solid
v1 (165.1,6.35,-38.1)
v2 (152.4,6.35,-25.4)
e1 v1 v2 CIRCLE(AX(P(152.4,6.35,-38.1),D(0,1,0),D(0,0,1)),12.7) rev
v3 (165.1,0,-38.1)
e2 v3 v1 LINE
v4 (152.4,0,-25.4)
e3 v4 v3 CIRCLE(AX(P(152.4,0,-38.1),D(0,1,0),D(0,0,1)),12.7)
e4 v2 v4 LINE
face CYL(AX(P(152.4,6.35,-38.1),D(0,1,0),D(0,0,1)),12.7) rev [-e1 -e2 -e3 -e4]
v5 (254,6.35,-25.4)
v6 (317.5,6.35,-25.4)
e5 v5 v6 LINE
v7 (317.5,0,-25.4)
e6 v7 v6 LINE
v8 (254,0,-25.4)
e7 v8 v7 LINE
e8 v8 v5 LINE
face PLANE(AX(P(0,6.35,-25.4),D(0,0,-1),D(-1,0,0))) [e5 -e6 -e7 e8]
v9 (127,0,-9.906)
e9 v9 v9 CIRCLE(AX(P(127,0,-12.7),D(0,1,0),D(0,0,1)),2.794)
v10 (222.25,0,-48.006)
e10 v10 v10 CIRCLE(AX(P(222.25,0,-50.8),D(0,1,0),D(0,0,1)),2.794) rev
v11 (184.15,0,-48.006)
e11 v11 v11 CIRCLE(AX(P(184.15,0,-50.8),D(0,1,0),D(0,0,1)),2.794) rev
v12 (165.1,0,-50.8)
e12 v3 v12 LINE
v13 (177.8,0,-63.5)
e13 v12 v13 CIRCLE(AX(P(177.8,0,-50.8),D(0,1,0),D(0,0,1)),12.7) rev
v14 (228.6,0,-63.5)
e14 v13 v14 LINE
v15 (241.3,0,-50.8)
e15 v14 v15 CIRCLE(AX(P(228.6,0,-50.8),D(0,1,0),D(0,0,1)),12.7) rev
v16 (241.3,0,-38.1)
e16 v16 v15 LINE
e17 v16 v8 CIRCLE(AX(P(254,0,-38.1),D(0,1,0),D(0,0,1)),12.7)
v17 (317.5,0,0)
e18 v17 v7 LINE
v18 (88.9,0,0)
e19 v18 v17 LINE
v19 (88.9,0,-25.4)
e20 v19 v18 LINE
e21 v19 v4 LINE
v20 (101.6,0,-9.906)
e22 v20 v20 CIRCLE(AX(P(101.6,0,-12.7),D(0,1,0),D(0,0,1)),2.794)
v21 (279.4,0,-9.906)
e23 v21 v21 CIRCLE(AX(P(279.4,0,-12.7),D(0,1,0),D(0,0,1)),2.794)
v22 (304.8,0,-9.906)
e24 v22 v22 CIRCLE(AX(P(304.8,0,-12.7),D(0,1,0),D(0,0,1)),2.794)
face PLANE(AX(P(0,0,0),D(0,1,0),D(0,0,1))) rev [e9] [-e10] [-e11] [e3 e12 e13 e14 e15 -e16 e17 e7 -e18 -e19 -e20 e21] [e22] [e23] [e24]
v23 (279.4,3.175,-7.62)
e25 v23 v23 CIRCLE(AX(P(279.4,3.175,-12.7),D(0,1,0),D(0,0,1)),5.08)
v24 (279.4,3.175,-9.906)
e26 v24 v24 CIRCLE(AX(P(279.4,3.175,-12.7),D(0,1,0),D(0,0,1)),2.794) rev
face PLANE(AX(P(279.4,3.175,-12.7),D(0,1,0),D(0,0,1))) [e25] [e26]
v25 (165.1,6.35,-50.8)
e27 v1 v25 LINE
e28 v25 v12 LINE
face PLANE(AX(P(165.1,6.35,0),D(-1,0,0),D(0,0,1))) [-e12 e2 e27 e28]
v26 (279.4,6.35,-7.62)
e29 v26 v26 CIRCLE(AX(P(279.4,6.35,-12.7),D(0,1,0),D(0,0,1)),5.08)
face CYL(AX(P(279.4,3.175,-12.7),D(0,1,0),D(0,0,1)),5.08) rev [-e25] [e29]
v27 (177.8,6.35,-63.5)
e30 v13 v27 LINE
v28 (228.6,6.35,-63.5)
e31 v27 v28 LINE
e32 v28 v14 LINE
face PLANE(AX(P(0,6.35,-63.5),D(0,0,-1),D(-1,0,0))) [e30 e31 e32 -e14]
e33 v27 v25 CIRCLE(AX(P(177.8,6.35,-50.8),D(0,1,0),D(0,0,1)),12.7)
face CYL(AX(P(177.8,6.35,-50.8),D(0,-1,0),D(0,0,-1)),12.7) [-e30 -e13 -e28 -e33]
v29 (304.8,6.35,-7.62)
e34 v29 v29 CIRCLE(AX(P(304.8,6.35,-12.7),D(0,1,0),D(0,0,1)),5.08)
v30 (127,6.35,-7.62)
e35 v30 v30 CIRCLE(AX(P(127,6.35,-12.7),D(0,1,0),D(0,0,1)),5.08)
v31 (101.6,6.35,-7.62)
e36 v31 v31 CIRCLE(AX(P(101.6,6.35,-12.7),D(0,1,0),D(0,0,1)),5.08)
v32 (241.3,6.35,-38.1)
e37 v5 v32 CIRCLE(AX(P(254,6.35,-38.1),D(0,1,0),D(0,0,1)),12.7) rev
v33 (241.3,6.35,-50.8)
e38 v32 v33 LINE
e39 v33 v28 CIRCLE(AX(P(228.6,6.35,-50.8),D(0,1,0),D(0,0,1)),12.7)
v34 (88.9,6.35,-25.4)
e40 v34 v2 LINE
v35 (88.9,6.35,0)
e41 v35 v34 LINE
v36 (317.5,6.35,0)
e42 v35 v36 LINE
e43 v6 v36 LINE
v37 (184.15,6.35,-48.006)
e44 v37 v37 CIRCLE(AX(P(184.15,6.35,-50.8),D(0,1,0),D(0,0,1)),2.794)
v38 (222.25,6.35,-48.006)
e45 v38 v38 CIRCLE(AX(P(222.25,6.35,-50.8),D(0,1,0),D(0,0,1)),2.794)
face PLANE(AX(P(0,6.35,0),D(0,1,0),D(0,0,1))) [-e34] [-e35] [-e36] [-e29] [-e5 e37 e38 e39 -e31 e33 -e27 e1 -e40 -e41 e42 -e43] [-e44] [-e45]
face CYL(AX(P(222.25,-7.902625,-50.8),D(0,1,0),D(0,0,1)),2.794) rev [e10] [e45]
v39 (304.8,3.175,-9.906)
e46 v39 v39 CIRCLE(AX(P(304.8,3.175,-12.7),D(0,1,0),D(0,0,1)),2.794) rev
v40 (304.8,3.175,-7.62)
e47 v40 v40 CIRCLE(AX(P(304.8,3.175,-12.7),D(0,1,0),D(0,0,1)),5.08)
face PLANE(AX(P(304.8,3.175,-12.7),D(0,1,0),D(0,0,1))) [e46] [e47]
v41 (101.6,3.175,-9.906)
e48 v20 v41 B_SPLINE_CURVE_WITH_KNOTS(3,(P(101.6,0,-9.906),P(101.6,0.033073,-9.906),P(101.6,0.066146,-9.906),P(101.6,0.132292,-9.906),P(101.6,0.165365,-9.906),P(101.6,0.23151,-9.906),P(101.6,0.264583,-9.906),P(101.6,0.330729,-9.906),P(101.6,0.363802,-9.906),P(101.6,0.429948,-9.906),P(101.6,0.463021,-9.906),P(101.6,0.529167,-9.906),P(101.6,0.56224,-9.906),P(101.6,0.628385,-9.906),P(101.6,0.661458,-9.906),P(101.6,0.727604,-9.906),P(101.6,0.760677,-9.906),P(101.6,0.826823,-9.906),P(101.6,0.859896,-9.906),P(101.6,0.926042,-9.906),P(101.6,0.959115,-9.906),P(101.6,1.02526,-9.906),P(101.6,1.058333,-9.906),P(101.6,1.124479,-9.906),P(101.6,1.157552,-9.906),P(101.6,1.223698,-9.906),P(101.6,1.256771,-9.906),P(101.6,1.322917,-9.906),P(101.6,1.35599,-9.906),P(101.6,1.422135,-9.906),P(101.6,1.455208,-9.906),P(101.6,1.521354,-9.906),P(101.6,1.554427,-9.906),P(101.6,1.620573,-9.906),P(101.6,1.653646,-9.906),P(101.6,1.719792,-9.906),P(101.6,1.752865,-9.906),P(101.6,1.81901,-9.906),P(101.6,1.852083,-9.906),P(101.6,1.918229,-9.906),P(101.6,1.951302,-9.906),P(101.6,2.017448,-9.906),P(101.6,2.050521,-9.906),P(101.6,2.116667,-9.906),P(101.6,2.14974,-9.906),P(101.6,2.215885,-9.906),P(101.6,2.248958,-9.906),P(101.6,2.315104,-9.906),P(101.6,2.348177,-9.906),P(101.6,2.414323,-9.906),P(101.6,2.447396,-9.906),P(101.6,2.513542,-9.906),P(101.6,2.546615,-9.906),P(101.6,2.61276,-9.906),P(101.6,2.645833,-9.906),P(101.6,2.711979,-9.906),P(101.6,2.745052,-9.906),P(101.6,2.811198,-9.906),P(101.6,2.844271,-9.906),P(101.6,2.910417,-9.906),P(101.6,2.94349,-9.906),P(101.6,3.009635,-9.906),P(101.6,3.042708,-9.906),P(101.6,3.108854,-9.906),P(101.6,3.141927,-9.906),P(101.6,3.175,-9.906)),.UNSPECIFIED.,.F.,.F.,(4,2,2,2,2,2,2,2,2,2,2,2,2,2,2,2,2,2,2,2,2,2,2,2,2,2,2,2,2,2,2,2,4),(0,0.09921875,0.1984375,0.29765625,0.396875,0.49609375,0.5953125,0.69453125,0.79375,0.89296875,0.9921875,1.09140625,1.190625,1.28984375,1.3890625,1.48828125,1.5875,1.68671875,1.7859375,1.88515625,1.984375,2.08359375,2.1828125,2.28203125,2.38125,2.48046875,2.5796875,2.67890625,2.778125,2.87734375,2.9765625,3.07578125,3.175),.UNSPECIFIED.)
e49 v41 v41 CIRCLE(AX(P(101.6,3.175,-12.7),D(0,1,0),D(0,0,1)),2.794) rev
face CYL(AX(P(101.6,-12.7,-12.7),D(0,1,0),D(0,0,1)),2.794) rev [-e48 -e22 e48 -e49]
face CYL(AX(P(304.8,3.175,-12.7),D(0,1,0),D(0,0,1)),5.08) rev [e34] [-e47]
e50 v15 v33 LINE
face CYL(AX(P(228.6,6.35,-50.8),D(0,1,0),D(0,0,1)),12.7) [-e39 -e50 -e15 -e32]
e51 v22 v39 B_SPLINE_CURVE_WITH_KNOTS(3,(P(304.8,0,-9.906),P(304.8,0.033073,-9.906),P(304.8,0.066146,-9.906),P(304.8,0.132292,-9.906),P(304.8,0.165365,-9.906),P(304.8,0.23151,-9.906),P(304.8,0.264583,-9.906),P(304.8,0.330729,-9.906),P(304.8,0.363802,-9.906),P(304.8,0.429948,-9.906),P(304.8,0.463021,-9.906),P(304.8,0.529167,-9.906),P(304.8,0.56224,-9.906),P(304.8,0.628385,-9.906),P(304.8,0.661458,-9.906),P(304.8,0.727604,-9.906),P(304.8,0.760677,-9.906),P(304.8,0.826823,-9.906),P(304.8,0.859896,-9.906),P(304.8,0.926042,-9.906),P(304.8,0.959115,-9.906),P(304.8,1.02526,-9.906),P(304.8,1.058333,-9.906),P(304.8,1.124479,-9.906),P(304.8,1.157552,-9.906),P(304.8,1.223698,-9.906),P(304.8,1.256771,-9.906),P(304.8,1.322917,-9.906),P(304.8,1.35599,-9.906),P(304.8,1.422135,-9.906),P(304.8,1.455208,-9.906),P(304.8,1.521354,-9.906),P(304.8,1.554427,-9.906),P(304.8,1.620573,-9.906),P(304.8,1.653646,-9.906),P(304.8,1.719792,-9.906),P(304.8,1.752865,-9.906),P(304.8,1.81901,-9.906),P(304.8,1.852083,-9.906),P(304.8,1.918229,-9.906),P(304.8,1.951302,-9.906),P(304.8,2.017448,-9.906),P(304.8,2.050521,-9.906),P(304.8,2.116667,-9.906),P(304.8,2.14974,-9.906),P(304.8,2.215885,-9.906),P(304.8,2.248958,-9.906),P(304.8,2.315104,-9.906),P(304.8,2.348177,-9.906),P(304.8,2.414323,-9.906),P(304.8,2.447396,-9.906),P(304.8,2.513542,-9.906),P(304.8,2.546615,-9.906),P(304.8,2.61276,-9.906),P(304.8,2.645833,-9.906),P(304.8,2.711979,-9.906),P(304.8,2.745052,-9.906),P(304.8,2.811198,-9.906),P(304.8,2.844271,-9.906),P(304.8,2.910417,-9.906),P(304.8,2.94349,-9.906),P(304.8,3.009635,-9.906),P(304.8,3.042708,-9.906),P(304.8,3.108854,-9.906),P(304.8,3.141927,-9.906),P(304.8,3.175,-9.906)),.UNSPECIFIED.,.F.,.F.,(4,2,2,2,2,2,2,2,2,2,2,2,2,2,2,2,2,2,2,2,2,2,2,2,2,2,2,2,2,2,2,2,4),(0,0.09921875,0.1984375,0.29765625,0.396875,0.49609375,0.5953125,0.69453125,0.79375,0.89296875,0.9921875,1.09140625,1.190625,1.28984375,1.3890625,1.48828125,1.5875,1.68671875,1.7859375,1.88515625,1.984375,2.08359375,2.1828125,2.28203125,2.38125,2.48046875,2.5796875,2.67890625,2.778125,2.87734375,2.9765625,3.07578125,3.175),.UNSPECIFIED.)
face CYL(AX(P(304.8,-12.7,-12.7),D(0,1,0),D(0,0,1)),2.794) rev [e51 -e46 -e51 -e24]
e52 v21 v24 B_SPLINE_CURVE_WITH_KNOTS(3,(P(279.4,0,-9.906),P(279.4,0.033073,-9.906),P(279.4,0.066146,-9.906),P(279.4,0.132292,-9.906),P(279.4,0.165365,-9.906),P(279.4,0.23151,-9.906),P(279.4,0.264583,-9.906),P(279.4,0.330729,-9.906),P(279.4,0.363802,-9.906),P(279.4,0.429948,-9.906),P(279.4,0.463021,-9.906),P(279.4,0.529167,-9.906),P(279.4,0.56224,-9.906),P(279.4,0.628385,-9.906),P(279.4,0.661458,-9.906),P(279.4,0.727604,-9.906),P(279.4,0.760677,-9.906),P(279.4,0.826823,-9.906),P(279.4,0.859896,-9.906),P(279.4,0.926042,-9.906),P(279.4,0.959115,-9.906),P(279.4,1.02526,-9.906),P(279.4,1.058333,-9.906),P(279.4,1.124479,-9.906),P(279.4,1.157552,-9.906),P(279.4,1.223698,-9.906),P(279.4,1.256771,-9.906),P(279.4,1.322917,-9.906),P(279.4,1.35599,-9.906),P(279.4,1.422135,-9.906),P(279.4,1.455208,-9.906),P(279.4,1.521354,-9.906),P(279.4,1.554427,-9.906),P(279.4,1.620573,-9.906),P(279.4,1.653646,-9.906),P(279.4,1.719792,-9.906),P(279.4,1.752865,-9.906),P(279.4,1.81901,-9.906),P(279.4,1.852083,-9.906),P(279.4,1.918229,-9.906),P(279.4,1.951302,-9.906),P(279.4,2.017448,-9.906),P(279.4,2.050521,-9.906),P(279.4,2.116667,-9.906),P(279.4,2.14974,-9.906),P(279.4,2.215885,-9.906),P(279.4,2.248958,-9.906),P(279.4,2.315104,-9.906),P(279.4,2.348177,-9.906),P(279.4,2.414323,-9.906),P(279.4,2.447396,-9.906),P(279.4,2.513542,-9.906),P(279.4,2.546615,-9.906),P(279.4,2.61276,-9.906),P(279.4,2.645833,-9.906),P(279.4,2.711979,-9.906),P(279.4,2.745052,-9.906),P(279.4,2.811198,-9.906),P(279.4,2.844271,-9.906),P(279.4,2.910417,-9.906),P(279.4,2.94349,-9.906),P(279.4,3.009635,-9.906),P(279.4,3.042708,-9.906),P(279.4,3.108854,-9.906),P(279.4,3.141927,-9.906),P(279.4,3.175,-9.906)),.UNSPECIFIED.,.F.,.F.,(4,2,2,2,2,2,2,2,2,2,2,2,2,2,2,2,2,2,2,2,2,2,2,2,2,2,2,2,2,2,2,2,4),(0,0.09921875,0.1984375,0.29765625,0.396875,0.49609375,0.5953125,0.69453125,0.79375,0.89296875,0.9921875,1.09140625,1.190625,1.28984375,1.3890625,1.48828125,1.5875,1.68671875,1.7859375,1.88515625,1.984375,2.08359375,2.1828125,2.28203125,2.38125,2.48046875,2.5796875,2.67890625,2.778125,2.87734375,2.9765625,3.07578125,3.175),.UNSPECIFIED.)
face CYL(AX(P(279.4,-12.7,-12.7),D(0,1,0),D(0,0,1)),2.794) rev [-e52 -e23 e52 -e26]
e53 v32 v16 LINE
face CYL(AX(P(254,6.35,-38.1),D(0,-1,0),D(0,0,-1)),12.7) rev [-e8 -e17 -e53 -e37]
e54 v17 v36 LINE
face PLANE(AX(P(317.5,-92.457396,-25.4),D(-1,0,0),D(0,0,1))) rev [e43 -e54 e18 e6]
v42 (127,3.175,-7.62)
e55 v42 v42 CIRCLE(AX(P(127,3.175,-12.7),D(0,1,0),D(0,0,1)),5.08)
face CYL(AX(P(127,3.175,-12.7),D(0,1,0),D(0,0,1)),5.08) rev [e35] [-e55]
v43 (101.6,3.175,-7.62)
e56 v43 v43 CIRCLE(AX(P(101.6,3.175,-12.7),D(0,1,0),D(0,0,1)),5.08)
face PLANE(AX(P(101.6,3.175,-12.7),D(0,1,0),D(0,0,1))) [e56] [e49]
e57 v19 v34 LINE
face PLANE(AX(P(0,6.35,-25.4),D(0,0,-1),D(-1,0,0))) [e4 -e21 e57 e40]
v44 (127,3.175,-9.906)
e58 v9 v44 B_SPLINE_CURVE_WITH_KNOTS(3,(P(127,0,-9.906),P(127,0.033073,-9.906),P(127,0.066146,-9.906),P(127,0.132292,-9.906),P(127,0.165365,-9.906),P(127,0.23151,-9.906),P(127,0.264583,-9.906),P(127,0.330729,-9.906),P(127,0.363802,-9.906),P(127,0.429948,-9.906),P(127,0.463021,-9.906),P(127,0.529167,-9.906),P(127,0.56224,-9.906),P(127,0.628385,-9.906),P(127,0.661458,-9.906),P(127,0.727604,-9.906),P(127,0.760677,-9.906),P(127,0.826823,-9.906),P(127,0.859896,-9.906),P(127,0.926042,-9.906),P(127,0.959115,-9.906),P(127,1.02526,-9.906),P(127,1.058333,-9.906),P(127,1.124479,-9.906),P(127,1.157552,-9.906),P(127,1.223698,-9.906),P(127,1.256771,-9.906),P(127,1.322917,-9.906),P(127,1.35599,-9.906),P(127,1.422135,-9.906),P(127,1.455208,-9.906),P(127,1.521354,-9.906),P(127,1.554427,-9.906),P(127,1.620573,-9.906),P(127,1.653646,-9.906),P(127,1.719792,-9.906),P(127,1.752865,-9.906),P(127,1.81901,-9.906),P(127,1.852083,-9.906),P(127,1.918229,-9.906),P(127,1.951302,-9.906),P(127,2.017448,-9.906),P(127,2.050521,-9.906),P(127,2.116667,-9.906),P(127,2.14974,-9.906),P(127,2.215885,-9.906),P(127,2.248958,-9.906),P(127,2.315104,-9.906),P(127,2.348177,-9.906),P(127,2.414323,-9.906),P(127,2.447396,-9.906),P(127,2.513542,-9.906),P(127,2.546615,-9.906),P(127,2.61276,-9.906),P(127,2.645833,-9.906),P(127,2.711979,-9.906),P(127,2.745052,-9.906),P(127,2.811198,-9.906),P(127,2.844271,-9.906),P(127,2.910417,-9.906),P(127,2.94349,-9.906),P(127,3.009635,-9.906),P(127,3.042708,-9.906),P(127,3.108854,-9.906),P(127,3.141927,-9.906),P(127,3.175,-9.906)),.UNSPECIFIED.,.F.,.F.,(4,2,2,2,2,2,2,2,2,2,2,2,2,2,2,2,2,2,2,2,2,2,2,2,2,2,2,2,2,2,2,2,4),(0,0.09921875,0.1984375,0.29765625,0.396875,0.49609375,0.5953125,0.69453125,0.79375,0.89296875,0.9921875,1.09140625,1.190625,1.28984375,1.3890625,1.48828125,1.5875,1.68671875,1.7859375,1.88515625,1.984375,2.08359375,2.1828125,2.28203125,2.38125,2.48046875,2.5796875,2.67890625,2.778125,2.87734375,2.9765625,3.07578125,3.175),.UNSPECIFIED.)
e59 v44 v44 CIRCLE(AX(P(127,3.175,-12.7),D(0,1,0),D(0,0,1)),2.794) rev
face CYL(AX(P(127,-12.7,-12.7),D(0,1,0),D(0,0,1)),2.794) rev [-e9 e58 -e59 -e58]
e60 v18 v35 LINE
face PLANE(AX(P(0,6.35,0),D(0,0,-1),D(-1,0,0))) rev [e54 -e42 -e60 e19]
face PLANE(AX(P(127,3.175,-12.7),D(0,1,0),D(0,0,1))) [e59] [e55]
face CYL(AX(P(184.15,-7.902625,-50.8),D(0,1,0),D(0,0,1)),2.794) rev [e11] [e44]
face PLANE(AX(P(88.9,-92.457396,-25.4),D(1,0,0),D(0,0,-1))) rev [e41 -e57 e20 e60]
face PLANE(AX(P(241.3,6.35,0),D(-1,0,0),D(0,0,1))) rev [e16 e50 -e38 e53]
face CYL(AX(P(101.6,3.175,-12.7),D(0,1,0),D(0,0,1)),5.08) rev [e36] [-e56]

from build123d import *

# Parameters (mm, degrees)
SKETCH1_W           = 406.4
SKETCH1_H           = 25.4
SKETCH1_W_2         = 76.2
SKETCH1_H_2         = 38.1
BOSS_EXTRUDE1_DEPTH = 6.35
SKETCH3_R           = 2.794
CUT_EXTRUDE2_DEPTH  = 6.35
FILLET1_R           = 12.7
SKETCH4_R           = 2.794
CUT_EXTRUDE3_DEPTH  = 19.05
SKETCH5_R           = 5.08
CUT_EXTRUDE4_DEPTH  = 3.175
SKETCH6_W           = 88.9
SKETCH6_H           = 25.4
CUT_EXTRUDE5_DEPTH  = 6.35


with BuildPart() as part:
    # Sketch1 → Boss-Extrude1 (new body)
    with BuildSketch(Plane(origin=(0, 0, 0), x_dir=(1, 0, 0), z_dir=(0, 1, 0))):
        with Locations((203.2, 12.7)):
            Rectangle(SKETCH1_W, SKETCH1_H)
        with Locations((203.2, 44.45)):
            Rectangle(SKETCH1_W_2, SKETCH1_H_2)
    extrude(amount=BOSS_EXTRUDE1_DEPTH)

    # Sketch3 → Cut-Extrude2 (cut)
    with BuildSketch(Plane(origin=(0, 6.35, 0), x_dir=(1, 0, 0), z_dir=(0, 1, 0))):
        with Locations(Location((222.25, 50.8, 0), (0, 0, 270))):
            Circle(SKETCH3_R)
        with Locations(Location((184.15, 50.8, 0), (0, 0, 270))):
            Circle(SKETCH3_R)
    extrude(amount=-CUT_EXTRUDE2_DEPTH, mode=Mode.SUBTRACT)

    # Fillet1
    fillet1_edges = [part.edges().sort_by_distance(p)[0] for p in [
        (406.4, 3.175, 0),
        (406.4, 3.175, -25.4),
        (0, 3.175, 0),
        (0, 3.175, -25.4),
        (165.1, 3.175, -25.4),
        (241.3, 3.175, -25.4),
        (241.3, 3.175, -63.5),
        (165.1, 3.175, -63.5),
    ]]
    fillet(fillet1_edges, radius=FILLET1_R - 0.0001)  # a hair under: the kernel refuses the full size

    # Sketch4 → Cut-Extrude3 (cut)
    with BuildSketch(Plane(origin=(0, 6.35, 0), x_dir=(1, 0, 0), z_dir=(0, 1, 0))):
        with Locations(Location((279.4, 12.7, 0), (0, 0, 270))):
            Circle(SKETCH4_R)
        with Locations(Location((304.8, 12.7, 0), (0, 0, 270))):
            Circle(SKETCH4_R)
        with Locations(Location((127, 12.7, 0), (0, 0, 270))):
            Circle(SKETCH4_R)
        with Locations(Location((101.6, 12.7, 0), (0, 0, 270))):
            Circle(SKETCH4_R)
    extrude(amount=-CUT_EXTRUDE3_DEPTH, mode=Mode.SUBTRACT)

    # Sketch5 → Cut-Extrude4 (cut)
    with BuildSketch(Plane(origin=(0, 6.35, 0), x_dir=(1, 0, 0), z_dir=(0, 1, 0))):
        with Locations(Location((101.6, 12.7, 0), (0, 0, 270))):
            Circle(SKETCH5_R)
        with Locations(Location((127, 12.7, 0), (0, 0, 270))):
            Circle(SKETCH5_R)
        with Locations(Location((279.4, 12.7, 0), (0, 0, 270))):
            Circle(SKETCH5_R)
        with Locations(Location((304.8, 12.7, 0), (0, 0, 270))):
            Circle(SKETCH5_R)
    extrude(amount=-CUT_EXTRUDE4_DEPTH, mode=Mode.SUBTRACT)

    # Sketch6 → Cut-Extrude5 (cut)
    with BuildSketch(Plane(origin=(0, 6.35, 0), x_dir=(1, 0, 0), z_dir=(0, 1, 0))):
        with Locations((44.45, 12.7)):
            Rectangle(SKETCH6_W, SKETCH6_H)
        with Locations((361.95, 12.7)):
            Rectangle(SKETCH6_W, SKETCH6_H)
    extrude(amount=-CUT_EXTRUDE5_DEPTH, mode=Mode.SUBTRACT)


solid = part.part
